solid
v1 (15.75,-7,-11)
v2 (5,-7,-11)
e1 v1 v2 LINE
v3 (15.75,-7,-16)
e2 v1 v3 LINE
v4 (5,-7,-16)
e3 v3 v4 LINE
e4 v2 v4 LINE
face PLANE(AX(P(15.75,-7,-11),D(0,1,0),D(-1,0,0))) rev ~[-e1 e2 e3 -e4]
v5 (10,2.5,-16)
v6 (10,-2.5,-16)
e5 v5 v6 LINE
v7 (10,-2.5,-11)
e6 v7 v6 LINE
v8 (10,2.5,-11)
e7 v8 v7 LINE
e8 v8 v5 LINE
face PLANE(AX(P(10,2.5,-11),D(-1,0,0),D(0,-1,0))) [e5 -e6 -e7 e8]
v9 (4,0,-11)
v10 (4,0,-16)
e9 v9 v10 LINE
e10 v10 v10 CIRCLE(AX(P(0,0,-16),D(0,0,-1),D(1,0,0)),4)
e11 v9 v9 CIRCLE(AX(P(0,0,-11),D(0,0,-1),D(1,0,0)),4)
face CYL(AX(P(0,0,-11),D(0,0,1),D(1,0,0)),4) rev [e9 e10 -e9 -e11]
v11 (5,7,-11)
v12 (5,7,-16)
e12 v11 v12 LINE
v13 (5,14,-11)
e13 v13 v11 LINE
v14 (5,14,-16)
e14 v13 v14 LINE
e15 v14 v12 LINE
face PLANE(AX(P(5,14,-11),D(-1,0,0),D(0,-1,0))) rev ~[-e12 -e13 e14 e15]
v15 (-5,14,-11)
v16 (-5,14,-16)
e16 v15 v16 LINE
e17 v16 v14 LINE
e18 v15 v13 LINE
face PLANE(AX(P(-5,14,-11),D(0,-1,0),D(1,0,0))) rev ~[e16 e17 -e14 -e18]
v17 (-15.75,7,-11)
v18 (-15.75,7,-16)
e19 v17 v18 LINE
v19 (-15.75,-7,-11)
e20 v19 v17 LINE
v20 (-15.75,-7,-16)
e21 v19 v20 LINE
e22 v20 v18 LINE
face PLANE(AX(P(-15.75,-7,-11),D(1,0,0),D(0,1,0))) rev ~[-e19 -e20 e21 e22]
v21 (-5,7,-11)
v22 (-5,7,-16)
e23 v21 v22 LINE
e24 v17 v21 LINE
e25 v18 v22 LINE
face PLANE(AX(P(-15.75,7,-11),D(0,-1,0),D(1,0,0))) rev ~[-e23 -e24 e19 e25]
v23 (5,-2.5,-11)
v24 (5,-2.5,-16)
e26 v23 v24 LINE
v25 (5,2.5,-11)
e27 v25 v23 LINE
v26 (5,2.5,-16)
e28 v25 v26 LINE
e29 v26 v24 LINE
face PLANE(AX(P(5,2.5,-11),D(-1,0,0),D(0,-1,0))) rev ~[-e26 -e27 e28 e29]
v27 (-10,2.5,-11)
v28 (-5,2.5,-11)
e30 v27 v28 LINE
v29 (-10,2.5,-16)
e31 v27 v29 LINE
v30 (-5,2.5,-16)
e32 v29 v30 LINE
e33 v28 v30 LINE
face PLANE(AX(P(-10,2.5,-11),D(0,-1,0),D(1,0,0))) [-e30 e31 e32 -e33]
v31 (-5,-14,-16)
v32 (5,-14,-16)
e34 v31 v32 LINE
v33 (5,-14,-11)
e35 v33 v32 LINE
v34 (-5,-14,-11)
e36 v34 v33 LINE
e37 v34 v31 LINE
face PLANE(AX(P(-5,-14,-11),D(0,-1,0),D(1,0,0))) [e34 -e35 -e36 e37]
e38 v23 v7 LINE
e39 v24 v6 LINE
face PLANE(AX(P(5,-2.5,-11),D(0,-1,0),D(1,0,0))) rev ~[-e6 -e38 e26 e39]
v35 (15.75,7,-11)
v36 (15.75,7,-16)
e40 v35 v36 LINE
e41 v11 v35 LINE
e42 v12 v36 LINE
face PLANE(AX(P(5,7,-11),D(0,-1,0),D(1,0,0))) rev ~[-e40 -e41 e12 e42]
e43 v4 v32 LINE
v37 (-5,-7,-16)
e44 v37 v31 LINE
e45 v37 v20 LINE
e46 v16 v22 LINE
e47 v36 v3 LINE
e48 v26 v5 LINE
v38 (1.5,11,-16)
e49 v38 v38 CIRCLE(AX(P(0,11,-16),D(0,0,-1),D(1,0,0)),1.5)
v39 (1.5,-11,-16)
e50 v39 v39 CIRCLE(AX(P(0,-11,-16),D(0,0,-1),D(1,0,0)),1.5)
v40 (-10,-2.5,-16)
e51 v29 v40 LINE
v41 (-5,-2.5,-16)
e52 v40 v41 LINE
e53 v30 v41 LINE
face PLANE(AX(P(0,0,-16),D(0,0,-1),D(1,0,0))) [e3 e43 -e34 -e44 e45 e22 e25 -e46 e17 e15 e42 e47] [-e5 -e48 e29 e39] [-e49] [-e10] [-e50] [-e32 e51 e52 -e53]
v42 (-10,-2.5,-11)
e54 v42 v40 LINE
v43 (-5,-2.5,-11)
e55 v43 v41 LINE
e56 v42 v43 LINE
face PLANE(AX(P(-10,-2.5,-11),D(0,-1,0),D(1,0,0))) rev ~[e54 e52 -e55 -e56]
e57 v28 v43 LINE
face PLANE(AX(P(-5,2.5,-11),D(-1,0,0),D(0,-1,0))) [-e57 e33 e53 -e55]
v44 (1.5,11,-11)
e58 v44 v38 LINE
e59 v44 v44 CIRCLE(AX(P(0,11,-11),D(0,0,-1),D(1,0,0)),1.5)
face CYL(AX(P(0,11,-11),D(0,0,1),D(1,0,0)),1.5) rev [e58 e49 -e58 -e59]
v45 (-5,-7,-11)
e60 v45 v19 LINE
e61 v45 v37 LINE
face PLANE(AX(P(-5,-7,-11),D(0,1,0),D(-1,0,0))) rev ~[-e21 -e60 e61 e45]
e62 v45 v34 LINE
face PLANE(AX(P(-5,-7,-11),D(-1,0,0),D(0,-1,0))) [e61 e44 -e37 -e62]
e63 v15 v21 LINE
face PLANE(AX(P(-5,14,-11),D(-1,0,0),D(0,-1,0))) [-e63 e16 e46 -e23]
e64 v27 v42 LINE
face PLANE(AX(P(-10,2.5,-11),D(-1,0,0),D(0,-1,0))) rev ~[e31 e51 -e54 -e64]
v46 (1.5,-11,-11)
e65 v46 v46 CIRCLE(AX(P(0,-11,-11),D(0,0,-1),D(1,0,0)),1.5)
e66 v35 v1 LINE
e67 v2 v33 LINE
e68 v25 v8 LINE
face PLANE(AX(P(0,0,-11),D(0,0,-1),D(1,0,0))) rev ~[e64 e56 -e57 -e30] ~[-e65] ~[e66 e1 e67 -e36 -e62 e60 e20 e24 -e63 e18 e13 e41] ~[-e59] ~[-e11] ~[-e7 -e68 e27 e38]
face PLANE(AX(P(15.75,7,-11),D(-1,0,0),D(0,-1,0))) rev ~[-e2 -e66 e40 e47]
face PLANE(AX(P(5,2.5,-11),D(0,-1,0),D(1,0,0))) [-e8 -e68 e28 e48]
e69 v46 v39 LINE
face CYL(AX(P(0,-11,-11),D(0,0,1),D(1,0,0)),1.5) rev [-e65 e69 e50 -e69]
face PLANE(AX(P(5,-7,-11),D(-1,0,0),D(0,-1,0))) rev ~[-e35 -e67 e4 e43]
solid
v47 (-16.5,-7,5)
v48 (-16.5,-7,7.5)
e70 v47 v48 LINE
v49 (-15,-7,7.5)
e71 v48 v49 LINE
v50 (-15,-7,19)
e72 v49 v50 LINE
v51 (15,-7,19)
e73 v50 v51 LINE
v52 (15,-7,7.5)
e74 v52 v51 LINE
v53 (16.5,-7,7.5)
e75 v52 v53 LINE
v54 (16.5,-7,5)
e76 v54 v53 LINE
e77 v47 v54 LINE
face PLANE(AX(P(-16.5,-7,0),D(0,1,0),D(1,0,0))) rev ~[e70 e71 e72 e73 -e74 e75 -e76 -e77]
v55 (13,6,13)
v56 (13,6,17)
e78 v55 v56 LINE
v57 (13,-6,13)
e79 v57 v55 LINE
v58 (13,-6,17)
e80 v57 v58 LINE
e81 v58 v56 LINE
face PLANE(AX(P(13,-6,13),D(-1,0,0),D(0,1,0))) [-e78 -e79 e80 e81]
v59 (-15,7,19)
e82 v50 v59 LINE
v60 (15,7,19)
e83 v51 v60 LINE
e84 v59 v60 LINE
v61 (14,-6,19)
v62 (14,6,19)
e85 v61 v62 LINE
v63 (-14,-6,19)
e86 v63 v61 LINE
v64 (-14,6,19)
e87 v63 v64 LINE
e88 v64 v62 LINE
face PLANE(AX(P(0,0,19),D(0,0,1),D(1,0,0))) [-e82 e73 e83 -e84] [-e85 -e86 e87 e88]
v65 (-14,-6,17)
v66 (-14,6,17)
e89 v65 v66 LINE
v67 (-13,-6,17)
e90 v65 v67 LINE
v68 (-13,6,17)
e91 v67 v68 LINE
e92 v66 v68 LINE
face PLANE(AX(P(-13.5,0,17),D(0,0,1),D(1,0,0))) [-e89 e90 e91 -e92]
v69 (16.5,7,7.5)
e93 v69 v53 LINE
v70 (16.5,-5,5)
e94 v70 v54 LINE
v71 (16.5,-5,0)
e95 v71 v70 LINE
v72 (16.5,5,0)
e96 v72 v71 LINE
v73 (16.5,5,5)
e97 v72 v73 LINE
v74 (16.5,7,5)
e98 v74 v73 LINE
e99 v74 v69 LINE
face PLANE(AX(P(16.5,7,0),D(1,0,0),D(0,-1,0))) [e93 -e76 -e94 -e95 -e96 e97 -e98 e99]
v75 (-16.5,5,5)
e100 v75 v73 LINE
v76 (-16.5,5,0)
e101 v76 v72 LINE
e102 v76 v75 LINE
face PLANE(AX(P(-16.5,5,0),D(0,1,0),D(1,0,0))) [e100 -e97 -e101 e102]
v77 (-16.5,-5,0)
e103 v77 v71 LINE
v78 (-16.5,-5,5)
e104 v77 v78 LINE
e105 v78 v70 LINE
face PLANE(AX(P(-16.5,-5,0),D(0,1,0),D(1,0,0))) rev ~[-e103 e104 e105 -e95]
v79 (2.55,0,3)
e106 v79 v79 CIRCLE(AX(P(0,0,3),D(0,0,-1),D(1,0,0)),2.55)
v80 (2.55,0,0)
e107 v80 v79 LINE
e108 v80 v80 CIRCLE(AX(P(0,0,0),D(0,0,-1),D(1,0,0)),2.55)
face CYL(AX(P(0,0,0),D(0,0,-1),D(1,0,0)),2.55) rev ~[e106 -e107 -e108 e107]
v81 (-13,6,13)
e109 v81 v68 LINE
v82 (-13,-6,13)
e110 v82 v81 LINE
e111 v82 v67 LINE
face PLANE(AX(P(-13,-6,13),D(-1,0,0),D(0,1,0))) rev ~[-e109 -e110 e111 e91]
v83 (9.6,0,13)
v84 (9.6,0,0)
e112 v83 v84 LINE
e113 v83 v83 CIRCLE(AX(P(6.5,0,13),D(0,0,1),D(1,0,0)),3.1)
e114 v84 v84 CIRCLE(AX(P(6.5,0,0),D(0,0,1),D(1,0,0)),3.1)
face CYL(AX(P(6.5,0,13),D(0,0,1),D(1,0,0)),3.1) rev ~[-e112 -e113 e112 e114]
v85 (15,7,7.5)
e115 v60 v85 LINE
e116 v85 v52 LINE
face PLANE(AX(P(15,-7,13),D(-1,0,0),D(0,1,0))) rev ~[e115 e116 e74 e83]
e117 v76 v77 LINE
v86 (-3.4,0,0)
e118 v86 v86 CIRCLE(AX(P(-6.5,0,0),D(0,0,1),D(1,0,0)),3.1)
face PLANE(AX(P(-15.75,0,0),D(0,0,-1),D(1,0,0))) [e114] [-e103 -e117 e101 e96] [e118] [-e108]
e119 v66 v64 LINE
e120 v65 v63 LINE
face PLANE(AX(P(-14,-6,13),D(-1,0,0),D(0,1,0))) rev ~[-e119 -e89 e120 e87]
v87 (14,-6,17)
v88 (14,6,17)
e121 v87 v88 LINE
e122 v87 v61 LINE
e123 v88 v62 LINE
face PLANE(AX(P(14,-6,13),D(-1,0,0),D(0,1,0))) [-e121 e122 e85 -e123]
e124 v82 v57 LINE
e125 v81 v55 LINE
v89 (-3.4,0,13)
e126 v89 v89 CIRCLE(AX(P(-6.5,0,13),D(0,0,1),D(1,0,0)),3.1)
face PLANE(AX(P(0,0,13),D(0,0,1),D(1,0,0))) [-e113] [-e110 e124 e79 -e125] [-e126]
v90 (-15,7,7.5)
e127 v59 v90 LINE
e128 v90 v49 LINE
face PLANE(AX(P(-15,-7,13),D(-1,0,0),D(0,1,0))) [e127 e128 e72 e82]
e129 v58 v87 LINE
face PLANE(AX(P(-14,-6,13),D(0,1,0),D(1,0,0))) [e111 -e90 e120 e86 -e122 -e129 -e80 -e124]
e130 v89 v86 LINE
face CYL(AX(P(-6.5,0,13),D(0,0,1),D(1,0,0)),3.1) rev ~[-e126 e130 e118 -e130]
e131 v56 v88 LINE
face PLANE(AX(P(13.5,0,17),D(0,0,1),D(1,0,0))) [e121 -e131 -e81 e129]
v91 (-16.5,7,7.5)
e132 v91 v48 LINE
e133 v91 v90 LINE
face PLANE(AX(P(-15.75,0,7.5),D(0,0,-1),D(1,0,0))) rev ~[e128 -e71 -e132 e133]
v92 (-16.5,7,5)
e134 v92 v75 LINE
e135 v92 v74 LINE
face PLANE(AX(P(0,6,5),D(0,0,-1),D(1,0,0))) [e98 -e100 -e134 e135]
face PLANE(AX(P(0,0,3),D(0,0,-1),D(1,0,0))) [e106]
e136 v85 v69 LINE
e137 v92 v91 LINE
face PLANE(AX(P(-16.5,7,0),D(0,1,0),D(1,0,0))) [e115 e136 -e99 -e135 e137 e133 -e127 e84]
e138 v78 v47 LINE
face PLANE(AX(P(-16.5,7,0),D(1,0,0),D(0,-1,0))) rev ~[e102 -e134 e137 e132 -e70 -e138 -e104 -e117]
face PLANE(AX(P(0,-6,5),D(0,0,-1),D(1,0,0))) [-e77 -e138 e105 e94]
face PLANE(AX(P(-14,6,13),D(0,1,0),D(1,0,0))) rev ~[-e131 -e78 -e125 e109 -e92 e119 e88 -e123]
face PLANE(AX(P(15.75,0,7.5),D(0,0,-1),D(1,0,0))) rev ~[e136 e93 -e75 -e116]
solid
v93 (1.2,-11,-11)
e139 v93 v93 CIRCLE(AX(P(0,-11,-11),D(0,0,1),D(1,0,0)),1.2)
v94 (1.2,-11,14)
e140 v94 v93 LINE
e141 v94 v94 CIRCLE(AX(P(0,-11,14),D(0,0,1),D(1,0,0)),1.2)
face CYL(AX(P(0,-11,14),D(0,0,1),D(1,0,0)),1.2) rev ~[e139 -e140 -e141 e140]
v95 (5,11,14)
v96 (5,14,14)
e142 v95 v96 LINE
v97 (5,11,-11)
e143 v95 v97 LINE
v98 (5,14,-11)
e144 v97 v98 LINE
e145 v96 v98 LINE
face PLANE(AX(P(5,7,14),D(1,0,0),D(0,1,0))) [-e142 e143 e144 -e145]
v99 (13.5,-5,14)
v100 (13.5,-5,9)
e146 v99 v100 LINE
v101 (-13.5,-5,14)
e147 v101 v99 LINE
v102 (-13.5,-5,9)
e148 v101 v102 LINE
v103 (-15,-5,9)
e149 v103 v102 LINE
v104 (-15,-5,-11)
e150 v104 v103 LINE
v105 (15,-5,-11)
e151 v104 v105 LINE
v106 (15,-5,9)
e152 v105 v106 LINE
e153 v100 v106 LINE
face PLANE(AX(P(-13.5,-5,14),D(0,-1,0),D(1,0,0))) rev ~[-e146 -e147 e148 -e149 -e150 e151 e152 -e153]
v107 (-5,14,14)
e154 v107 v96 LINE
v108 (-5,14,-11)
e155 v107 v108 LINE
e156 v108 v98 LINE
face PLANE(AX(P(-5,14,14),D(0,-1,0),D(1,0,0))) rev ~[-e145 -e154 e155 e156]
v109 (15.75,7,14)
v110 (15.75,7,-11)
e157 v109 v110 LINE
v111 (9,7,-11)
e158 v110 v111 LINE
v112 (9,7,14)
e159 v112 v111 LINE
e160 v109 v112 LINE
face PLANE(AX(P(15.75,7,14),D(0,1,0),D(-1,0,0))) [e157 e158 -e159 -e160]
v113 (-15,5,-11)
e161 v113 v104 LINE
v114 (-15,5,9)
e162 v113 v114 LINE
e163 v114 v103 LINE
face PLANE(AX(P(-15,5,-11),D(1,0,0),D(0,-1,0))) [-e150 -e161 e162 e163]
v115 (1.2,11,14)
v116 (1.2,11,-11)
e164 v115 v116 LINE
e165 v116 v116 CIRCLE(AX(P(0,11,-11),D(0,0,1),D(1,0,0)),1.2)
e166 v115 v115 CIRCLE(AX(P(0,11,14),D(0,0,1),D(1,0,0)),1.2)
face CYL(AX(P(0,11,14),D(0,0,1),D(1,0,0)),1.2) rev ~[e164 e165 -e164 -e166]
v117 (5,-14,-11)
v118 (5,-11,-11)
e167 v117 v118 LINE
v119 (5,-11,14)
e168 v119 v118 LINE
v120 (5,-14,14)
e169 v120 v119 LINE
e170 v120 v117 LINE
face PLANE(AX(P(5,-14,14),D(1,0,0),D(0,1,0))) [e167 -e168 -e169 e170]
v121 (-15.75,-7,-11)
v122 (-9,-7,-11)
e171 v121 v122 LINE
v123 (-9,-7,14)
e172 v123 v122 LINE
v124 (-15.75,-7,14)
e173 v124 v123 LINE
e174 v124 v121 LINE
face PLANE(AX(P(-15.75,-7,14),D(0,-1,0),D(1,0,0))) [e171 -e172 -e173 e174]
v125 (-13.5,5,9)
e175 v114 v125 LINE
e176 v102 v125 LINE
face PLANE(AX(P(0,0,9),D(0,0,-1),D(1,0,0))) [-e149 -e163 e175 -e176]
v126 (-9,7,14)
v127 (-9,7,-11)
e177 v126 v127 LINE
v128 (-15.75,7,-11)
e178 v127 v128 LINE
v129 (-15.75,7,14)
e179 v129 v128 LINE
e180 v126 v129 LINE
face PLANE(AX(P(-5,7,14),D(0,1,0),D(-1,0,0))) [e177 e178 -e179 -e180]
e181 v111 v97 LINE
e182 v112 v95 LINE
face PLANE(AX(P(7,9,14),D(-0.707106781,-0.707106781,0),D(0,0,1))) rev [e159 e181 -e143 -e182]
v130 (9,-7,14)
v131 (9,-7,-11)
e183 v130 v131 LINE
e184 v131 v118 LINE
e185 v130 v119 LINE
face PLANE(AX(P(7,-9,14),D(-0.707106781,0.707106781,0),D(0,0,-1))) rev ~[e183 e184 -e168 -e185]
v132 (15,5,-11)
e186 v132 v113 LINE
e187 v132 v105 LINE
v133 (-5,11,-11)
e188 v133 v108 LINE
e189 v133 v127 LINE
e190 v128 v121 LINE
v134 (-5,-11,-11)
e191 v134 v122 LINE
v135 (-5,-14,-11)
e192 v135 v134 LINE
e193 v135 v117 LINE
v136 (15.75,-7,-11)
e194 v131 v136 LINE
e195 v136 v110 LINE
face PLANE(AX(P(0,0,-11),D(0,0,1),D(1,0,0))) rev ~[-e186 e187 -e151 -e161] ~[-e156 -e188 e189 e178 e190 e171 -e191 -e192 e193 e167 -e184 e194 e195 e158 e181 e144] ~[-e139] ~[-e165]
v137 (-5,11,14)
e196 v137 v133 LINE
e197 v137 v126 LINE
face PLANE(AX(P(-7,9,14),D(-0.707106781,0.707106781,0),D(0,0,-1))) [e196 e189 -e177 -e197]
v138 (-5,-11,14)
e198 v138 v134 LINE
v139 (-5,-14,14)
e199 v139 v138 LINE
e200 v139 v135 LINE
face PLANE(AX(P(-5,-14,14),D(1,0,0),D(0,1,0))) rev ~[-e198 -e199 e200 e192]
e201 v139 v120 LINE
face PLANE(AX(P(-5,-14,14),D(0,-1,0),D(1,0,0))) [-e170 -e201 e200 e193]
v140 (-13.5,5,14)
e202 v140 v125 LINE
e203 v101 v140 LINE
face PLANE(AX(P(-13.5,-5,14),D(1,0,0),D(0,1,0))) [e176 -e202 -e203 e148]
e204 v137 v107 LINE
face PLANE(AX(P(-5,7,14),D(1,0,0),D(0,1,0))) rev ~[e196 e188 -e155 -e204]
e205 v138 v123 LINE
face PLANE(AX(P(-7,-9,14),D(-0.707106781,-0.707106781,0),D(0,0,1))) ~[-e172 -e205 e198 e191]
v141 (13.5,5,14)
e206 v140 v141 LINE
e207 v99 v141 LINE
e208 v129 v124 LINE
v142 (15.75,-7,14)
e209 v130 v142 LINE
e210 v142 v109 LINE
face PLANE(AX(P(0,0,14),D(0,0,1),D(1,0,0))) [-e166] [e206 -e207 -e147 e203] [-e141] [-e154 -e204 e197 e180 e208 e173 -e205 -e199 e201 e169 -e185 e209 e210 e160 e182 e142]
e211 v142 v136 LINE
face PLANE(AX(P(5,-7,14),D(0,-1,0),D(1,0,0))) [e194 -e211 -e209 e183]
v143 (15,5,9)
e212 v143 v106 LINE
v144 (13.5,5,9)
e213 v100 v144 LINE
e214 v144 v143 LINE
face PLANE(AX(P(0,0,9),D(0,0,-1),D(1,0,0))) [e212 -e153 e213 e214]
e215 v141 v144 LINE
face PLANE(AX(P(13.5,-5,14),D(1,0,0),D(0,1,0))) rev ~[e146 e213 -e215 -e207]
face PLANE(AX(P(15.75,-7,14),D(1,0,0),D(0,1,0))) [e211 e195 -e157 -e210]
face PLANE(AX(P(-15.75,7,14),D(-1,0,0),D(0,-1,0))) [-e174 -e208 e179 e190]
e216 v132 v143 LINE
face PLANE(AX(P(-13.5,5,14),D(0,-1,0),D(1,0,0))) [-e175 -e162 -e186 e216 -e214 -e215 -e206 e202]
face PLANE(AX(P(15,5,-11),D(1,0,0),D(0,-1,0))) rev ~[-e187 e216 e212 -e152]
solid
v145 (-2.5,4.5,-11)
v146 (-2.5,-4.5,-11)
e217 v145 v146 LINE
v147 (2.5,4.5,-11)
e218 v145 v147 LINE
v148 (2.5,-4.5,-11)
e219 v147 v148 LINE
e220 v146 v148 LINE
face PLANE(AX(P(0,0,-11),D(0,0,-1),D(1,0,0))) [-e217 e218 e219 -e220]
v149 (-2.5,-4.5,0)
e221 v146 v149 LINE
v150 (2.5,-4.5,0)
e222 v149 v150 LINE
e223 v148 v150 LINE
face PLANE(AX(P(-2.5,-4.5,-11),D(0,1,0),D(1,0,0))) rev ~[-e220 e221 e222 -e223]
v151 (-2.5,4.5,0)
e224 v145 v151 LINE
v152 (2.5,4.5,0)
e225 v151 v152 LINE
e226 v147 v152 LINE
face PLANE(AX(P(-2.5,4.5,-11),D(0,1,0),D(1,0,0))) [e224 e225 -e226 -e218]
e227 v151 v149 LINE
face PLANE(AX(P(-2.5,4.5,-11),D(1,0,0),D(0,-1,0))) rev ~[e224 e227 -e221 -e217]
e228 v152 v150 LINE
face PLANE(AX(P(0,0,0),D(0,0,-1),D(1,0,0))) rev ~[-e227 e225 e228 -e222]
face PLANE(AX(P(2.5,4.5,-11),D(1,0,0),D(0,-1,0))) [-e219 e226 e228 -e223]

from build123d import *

# Parameters (mm, degrees)
F0_W      = 30
F0_H      = 14
F1_DEPTH  = 13
F2_W      = 30
F2_H      = 14
F2_W_2    = 28
F2_H_2    = 12
F3_DEPTH  = 6
F4_W      = 1
F4_H      = 12
F5_DEPTH  = 4
F6_R      = 3.1
F7_DEPTH  = 19
F8_W      = 1.5
F8_H      = 14
F9_DEPTH  = 7.5
F10_R     = 2.55
F11_DEPTH = 3
F13_W     = 27
F13_H     = 10
F13_W_2   = 10
F13_H_2   = 7
F14_DEPTH = 25
F15_W     = 30
F15_H     = 10
F16_DEPTH = 20
F17_R     = 1.2
F18_DEPTH = 25
F19_W     = 5
F19_H     = 5
F19_R     = 4
F19_W_2   = 10
F19_H_2   = 7
F19_R_2   = 1.5
F20_DEPTH = 5
F21_SIZE  = 4
F23_W     = 5
F23_H     = 9
F24_DEPTH = 11
F25_W     = 33
F25_H     = 2
F26_DEPTH = 5


with BuildPart() as f1:
    # F0 (on Top) → F1 (new body)
    with BuildSketch(Plane.XY):
        Rectangle(F0_W, F0_H)
    extrude(amount=F1_DEPTH)

    # F2 (on face) → F3 (join)
    with BuildSketch(Plane.XY.offset(13)):
        Rectangle(F2_W, F2_H)
        Rectangle(F2_W_2, F2_H_2, mode=Mode.SUBTRACT)
    extrude(amount=F3_DEPTH)

    # F4 (on face) → F5 (join)
    with BuildSketch(Plane.XY.offset(13)):
        with Locations((-13.5, 0)):
            Rectangle(F4_W, F4_H)
        with Locations((13.5, 0)):
            Rectangle(F4_W, F4_H)
    extrude(amount=F5_DEPTH)

    # F6 (on face) → F7 (cut)
    with BuildSketch(Plane.XY.offset(13)):
        with Locations((-6.5, 0)):
            Circle(F6_R)
        with Locations((6.5, 0)):
            Circle(F6_R)
    extrude(amount=-F7_DEPTH, mode=Mode.SUBTRACT)

    # F8 (on face) → F9 (join)
    with BuildSketch(Plane(origin=(0, 0, 0), x_dir=(1, 0, 0), z_dir=(0, 0, -1))):
        with Locations((-15.75, 0)):
            Rectangle(F8_W, F8_H)
        with Locations((15.75, 0)):
            Rectangle(F8_W, F8_H)
    extrude(amount=-F9_DEPTH)

    # F10 (on face) → F11 (cut)
    with BuildSketch(Plane(origin=(0, 0, 0), x_dir=(1, 0, 0), z_dir=(0, 0, -1))):
        Circle(F10_R)
    extrude(amount=-F11_DEPTH, mode=Mode.SUBTRACT)

    # F25 (on face) → F26 (cut)
    with BuildSketch(Plane(origin=(0, 0, 0), x_dir=(1, 0, 0), z_dir=(0, 0, -1))):
        with Locations((0, 6)):
            Rectangle(F25_W, F25_H)
        with Locations((0, -6)):
            Rectangle(F25_W, F25_H)
    extrude(amount=-F26_DEPTH, mode=Mode.SUBTRACT)


with BuildPart() as f14:
    # F13 (on offset) → F14 (new body)
    with BuildSketch(Plane.XY.offset(14)):
        Polygon((5, -7), (15.75, -7), (15.75, 7), (5, 7), (-5, 7), (-15.75, 7), (-15.75, -7), (-5, -7), align=None)
        Rectangle(F13_W, F13_H, mode=Mode.SUBTRACT)
        with Locations((0, -10.5)):
            Rectangle(F13_W_2, F13_H_2)
        with Locations((0, 10.5)):
            Rectangle(F13_W_2, F13_H_2)
    extrude(amount=-F14_DEPTH)

    # F15 (on face) → F16 (cut)
    with BuildSketch(Plane(origin=(0, 0, -11), x_dir=(1, 0, 0), z_dir=(0, 0, -1))):
        Rectangle(F15_W, F15_H)
    extrude(amount=-F16_DEPTH, mode=Mode.SUBTRACT)

    # F17 (on face) → F18 (cut)
    with BuildSketch(Plane.XY.offset(14)):
        with Locations((0, 11)):
            Circle(F17_R)
        with Locations((0, -11)):
            Circle(F17_R)
    extrude(amount=-F18_DEPTH, mode=Mode.SUBTRACT)

    # F21
    f21_edges = [f14.edges().sort_by_distance(p)[0] for p in [
        (-5, 7, 1.5),
        (5, 7, 1.5),
        (5, -7, 1.5),
        (-5, -7, 1.5),
    ]]
    chamfer(f21_edges, length=F21_SIZE)


with BuildPart() as f20:
    # F19 (on face) → F20 (new body)
    with BuildSketch(Plane(origin=(0, 0, -11), x_dir=(1, 0, 0), z_dir=(0, 0, -1))):
        Polygon((5, -7), (15.75, -7), (15.75, 7), (5, 7), (-5, 7), (-15.75, 7), (-15.75, -7), (-5, -7), align=None)
        with Locations((-7.5, 0)):
            Rectangle(F19_W, F19_H, mode=Mode.SUBTRACT)
        Circle(F19_R, mode=Mode.SUBTRACT)
        with Locations((7.5, 0)):
            Rectangle(F19_W, F19_H, mode=Mode.SUBTRACT)
        with Locations((0, -10.5)):
            Rectangle(F19_W_2, F19_H_2)
        with Locations((0, -11)):
            Circle(F19_R_2, mode=Mode.SUBTRACT)
        with Locations((0, 10.5)):
            Rectangle(F19_W_2, F19_H_2)
        with Locations((0, 11)):
            Circle(F19_R_2, mode=Mode.SUBTRACT)
    extrude(amount=F20_DEPTH)


with BuildPart() as f24:
    # F23 (on offset) → F24 (new body)
    with BuildSketch(Plane(origin=(0, 0, -11), x_dir=(1, 0, 0), z_dir=(0, 0, -1))):
        Rectangle(F23_W, F23_H)
    extrude(amount=-F24_DEPTH)


solid = Compound([f1.part, f14.part, f20.part, f24.part])
